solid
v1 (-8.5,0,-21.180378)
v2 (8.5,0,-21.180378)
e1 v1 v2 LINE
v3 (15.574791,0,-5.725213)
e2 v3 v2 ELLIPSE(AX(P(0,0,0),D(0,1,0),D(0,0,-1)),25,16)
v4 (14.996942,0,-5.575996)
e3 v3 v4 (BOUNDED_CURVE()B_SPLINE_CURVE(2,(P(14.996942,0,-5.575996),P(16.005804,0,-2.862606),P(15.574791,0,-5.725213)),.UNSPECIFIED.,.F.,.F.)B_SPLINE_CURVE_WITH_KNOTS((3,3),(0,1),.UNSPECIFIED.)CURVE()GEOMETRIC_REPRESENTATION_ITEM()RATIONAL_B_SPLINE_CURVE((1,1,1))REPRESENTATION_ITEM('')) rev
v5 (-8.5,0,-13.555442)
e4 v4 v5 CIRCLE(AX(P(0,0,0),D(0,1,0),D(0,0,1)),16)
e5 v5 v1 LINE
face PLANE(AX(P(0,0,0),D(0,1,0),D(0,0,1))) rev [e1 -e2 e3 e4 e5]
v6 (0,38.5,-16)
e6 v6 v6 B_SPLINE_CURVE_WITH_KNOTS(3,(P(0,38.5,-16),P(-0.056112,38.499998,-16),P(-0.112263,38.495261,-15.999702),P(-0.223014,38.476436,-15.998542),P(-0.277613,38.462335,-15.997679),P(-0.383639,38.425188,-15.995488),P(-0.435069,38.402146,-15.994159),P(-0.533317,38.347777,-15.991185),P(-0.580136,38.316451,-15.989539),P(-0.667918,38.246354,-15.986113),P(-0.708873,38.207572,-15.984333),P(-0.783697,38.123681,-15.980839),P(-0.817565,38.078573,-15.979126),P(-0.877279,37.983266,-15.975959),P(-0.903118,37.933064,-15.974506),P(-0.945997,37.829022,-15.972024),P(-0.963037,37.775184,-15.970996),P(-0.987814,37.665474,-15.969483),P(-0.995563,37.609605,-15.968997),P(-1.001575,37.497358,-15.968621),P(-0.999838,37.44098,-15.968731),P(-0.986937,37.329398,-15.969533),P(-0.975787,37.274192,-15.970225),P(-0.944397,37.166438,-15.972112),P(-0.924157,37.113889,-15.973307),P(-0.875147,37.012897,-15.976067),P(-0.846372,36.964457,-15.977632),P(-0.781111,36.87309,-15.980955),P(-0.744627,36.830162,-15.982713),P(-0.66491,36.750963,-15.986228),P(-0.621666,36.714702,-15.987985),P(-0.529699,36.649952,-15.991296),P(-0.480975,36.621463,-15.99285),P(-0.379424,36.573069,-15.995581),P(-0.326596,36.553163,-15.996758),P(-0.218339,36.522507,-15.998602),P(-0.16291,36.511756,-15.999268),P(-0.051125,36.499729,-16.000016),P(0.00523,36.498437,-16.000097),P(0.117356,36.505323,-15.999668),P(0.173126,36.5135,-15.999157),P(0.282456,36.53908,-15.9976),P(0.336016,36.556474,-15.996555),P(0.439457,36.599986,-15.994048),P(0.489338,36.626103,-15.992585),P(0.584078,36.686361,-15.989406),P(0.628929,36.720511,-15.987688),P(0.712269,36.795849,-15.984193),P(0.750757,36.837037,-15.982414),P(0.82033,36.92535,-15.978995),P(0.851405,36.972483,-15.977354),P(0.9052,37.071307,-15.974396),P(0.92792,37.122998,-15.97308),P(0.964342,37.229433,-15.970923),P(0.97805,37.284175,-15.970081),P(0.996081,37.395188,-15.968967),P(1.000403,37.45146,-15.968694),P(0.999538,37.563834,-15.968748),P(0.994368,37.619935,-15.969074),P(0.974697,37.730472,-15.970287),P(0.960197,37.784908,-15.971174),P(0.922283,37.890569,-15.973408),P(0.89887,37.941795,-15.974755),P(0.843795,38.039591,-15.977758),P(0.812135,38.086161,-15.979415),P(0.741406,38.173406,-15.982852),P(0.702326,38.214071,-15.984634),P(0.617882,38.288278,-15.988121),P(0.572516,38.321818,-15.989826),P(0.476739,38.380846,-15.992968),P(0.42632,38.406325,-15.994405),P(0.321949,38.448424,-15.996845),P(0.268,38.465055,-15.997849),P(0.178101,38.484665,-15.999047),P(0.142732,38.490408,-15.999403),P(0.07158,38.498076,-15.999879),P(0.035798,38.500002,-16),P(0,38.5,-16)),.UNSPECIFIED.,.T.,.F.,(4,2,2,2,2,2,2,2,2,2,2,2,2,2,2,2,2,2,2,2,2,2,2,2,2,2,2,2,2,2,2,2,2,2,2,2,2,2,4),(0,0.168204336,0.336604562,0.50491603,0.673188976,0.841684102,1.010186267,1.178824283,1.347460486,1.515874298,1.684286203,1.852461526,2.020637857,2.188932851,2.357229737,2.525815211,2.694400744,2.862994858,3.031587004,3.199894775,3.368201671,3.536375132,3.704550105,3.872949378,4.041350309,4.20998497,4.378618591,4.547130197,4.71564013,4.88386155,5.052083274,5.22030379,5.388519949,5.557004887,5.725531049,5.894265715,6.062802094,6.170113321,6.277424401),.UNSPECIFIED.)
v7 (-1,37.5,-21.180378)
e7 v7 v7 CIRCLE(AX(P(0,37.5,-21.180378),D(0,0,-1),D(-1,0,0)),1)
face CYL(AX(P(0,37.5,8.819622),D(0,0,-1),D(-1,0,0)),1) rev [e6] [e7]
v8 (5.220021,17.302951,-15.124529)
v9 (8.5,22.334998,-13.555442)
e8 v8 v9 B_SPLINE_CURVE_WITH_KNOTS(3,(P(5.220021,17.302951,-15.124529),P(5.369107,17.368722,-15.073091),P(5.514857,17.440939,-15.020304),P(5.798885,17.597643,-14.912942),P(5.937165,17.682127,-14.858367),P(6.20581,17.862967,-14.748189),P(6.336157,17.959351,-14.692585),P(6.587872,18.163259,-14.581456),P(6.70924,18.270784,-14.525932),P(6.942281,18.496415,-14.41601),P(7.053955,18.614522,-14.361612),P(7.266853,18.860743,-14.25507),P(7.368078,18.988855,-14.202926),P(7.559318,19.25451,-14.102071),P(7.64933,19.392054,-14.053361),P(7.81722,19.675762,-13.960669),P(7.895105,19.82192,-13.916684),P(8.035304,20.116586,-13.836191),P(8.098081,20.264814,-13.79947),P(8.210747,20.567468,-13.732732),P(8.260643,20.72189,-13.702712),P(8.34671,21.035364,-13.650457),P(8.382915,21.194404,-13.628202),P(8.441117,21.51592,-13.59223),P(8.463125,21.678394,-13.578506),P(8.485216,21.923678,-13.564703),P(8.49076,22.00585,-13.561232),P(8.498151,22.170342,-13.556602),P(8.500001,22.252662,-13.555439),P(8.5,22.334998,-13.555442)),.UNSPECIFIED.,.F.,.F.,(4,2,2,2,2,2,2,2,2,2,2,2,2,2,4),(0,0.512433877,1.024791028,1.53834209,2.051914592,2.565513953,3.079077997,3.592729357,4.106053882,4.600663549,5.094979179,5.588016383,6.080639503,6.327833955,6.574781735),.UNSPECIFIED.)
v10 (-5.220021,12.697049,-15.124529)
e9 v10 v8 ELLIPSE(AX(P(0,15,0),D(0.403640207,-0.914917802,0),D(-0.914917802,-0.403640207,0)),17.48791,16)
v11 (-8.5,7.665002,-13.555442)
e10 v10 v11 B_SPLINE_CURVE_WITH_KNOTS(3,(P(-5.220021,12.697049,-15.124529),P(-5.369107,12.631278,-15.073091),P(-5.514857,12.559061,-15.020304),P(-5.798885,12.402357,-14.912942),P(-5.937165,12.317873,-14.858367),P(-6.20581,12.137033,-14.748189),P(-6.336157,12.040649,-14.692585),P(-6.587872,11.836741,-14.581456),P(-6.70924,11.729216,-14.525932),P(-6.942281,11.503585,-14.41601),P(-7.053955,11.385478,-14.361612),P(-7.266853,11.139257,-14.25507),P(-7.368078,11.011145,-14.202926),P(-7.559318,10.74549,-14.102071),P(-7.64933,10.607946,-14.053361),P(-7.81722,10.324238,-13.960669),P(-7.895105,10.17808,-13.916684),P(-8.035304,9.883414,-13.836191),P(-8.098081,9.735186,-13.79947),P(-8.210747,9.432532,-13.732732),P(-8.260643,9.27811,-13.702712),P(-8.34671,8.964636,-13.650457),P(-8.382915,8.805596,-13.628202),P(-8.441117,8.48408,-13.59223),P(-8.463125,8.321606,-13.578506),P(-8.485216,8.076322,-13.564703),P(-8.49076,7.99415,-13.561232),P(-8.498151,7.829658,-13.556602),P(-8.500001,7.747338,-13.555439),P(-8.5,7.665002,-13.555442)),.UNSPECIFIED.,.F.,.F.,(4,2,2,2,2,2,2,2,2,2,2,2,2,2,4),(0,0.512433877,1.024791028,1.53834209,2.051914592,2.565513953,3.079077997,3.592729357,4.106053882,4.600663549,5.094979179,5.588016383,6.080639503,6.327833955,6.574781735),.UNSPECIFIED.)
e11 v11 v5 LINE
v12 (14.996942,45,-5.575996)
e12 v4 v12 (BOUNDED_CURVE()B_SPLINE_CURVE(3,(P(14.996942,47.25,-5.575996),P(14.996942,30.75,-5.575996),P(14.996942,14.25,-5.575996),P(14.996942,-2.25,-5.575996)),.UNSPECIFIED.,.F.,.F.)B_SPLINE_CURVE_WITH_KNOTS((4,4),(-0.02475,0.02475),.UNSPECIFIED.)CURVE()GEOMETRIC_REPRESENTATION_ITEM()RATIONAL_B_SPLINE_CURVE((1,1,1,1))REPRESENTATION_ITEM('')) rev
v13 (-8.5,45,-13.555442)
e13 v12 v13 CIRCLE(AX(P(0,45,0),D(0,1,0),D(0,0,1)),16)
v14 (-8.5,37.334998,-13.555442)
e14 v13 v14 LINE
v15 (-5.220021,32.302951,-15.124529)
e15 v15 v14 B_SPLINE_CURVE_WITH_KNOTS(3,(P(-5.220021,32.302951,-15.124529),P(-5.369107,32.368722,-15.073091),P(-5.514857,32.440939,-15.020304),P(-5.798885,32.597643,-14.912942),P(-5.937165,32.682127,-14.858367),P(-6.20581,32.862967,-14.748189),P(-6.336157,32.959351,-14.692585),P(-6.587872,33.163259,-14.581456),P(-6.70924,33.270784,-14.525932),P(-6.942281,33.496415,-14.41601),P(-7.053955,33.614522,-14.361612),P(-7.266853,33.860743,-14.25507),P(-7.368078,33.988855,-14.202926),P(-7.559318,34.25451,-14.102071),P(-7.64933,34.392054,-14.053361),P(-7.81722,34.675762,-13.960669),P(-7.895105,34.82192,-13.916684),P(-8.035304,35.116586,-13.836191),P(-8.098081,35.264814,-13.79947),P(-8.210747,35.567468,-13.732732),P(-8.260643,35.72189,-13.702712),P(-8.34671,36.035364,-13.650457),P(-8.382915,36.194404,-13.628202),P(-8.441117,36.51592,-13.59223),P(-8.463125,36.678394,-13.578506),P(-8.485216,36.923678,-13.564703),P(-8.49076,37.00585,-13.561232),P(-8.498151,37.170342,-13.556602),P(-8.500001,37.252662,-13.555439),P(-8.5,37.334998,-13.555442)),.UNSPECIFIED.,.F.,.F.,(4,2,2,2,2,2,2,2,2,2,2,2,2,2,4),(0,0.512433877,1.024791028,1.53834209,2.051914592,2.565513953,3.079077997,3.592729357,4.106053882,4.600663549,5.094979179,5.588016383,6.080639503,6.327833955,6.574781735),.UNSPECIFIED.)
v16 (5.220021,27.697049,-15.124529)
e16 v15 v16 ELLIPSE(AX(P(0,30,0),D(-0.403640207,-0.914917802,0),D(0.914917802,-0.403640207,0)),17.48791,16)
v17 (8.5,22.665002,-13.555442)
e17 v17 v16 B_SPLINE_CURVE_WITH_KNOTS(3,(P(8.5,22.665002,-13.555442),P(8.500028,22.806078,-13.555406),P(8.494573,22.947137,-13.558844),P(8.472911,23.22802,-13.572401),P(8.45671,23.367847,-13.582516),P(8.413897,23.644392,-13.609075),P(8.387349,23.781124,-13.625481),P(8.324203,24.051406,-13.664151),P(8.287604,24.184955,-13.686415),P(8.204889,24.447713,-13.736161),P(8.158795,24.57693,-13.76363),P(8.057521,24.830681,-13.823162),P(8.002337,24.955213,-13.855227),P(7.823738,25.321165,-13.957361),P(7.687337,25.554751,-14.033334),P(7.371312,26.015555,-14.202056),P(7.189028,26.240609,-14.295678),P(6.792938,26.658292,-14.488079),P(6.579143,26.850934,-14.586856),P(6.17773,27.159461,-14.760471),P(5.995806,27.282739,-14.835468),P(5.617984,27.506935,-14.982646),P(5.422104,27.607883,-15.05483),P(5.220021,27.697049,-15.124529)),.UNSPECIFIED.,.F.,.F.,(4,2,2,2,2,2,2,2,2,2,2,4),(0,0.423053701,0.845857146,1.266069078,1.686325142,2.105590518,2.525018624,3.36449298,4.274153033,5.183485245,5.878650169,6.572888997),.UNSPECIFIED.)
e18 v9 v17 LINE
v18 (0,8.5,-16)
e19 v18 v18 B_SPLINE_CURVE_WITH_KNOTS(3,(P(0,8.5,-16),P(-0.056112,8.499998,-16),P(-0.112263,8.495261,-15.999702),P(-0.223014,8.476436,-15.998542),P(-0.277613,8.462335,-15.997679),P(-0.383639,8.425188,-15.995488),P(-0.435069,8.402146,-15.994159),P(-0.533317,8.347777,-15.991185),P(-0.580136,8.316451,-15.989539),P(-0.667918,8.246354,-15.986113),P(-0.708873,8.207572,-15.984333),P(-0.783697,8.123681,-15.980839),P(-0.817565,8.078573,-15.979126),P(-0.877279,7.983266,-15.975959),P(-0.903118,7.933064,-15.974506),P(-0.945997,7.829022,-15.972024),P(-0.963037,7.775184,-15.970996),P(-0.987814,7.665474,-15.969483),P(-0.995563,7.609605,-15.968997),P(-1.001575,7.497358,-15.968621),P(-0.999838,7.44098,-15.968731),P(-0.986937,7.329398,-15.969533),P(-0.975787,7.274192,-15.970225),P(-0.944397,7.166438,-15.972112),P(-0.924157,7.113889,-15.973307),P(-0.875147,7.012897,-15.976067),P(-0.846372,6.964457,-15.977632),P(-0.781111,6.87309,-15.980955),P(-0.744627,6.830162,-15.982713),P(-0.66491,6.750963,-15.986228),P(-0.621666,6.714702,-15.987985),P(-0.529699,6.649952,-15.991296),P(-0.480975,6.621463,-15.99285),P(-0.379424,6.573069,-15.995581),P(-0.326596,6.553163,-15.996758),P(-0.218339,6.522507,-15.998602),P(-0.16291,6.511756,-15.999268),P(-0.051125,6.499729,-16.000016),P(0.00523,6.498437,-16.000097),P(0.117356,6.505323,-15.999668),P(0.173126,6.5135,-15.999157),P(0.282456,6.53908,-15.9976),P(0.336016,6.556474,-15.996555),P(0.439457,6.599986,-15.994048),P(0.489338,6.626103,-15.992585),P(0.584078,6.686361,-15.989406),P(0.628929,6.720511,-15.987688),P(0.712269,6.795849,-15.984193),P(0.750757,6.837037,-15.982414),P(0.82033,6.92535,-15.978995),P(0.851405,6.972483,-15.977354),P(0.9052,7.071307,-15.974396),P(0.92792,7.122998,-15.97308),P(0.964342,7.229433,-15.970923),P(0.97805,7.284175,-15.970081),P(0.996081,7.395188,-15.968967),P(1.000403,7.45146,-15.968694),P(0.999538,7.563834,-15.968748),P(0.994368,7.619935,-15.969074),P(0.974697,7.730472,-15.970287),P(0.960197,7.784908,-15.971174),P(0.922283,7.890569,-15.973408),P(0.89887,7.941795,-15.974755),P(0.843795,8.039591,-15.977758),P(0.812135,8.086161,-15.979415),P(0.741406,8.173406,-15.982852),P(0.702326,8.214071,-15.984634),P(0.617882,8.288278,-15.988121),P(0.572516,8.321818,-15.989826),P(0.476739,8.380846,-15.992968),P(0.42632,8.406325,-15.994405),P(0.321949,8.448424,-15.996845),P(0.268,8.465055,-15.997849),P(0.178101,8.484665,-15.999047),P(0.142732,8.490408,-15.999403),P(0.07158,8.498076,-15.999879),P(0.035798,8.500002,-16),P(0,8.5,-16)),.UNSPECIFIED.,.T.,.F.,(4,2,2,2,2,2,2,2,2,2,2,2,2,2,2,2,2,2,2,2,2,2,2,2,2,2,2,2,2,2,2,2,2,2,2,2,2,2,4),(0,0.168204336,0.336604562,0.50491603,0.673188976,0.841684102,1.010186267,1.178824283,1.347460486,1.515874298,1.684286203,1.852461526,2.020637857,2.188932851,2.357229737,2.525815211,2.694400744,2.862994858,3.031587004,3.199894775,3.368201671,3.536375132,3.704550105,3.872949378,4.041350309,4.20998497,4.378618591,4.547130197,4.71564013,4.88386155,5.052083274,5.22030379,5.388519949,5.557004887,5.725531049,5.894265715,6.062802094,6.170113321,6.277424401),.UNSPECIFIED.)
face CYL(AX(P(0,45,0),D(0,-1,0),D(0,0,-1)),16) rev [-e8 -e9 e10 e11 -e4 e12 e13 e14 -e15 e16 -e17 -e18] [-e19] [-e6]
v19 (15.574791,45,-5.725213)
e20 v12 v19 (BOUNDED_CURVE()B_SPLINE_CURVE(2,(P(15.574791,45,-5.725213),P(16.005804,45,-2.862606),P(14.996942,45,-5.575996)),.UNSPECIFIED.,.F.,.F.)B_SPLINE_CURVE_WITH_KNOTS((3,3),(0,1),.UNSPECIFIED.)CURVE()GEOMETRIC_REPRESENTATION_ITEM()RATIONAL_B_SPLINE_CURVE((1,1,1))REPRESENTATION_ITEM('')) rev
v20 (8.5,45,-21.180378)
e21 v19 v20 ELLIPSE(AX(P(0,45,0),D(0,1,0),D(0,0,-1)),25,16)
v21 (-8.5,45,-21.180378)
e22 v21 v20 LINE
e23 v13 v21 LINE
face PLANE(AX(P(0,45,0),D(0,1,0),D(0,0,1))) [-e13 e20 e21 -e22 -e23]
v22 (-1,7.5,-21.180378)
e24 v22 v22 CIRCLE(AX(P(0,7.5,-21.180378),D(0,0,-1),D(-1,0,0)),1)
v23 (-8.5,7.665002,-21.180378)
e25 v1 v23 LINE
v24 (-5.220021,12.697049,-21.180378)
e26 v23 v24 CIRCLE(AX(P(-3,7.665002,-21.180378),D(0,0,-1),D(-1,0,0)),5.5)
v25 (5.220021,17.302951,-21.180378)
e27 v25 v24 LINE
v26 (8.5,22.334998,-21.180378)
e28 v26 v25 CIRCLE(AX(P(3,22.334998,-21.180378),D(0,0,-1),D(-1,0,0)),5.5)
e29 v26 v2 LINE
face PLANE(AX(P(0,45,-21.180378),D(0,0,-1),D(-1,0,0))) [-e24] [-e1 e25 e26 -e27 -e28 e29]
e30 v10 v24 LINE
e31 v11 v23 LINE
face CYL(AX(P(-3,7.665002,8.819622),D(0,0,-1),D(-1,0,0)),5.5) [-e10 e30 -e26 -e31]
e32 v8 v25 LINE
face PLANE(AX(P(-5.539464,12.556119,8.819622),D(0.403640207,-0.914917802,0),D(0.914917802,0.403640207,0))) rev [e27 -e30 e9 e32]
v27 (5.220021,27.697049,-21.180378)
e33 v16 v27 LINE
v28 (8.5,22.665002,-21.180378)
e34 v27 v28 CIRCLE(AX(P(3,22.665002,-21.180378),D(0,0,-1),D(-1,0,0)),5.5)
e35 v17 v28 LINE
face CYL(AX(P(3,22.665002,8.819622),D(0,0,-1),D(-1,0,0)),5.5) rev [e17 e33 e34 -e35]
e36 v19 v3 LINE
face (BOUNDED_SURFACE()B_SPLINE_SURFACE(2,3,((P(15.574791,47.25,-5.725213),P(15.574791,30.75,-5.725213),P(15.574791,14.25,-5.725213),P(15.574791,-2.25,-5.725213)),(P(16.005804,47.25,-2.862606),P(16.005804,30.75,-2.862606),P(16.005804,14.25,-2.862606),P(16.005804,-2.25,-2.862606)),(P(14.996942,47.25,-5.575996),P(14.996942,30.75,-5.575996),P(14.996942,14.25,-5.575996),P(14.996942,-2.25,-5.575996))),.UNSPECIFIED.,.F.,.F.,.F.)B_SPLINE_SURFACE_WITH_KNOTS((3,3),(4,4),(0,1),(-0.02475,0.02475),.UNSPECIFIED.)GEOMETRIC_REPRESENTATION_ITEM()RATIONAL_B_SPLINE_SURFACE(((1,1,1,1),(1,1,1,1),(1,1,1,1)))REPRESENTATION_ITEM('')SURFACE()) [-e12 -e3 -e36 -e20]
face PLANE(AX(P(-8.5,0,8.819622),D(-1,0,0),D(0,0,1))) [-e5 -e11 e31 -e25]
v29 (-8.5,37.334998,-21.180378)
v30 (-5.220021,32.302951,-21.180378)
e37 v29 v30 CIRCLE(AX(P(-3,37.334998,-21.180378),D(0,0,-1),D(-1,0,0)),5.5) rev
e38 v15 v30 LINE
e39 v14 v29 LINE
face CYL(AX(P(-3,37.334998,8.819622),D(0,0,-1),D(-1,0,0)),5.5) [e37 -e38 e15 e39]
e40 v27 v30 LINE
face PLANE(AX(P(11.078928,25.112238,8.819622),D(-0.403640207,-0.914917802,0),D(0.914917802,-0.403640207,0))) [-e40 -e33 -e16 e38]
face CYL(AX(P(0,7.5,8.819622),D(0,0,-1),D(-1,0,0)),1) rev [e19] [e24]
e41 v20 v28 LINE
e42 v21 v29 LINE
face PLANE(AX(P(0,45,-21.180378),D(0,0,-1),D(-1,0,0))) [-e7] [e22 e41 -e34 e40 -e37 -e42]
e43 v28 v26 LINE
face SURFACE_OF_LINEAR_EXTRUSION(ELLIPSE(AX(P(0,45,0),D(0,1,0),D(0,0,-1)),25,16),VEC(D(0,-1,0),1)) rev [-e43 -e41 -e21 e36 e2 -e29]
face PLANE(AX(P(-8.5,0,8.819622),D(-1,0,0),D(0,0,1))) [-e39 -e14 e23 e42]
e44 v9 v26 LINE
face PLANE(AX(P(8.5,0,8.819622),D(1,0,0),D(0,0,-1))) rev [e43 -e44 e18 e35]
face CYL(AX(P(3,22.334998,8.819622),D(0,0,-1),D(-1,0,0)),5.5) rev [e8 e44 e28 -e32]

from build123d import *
from OCP.BRepAlgoAPI import BRepAlgoAPI_Cut
from OCP.TopTools import TopTools_ListOfShape

# Parameters (mm, degrees)
BOSS_EXTRUDE1_DEPTH = 45
FILLET1_START       = -1
FILLET1_DEPTH       = 47
SKETCH2_R           = 1.0000000000000002
SKETCH2_R_2         = 1
CUT_EXTRUDE2_DEPTH  = 30


with BuildPart() as part:
    # Sketch1 → Boss-Extrude1 (new body)
    with BuildSketch(Plane(origin=(0, 0, 0), x_dir=(1, 0, 0), z_dir=(0, 1, 0))):
        with BuildLine():
            add(Edge.make_bspline(
                [(-8.50000000000007, 21.18037767457174), (-15.999999999999995, 13.832083379312117), (-16, 5.08e-15)],
                knots=[0.5600753062265875, 0.5600753062265875, 0.5600753062265875, 1.5707963267948966, 1.5707963267948966, 1.5707963267948966], degree=2, weights=[1, 0.8750000000000013, 1]))
            ThreePointArc((-16, 1.96e-15), (9.8e-16, 16), (16, 0))
            add(Edge.make_bspline(
                [(16, -8.15e-15), (16.000000000000007, 13.83208337931212), (8.500000000000071, 21.18037767457174)],
                knots=[4.71238898038469, 4.71238898038469, 4.71238898038469, 5.723110000953, 5.723110000953, 5.723110000953], degree=2, weights=[1, 0.8750000000000011, 1]))
            Line((8.500000000000096, 21.18037767457181), (-8.500000000000096, 21.18037767457181))
        make_face()
    extrude(amount=BOSS_EXTRUDE1_DEPTH)


with BuildPart() as fillet1_tool:
    # Fillet1: read off the stored shape, not the designer's step
    # Fillet1 outline → Fillet1 (new body)
    with BuildSketch(Plane(origin=(0, 0, 0), x_dir=(1, 0, 0), z_dir=(0, 1, 0)).offset(FILLET1_START)):
        with BuildLine():
            ThreePointArc((-16, 0), (-15.747238962, 2.832748677), (-14.996941867, 5.575996291))
            add(Edge.make_bspline(
                [(-14.996941867, 5.575996291), (-16.0058043455114, 2.86260640488592), (-15.574790718, 5.72521281)],
                knots=[0, 0, 0, 1, 1, 1], degree=2))
            add(Edge.make_bspline(
                [(-15.574790718, 5.72521281), (-15.999999999999998, 2.901156361523757), (-16, 0)],
                knots=[1.3355704187750619, 1.3355704187750619, 1.3355704187750619, 1.5707963267948966, 1.5707963267948966, 1.5707963267948966], degree=2, weights=[0.9553582068029054, 0.9709086504543596, 1]))
        make_face()
        with BuildLine():
            add(Edge.make_bspline(
                [(15.574790718, 5.72521281), (16.0058043455114, 2.86260640488591), (14.996941867, 5.575996291)],
                knots=[0, 0, 0, 1, 1, 1], degree=2))
            ThreePointArc((14.996941867, 5.575996291), (15.747238962, 2.832748677), (16, 0))
            add(Edge.make_bspline(
                [(16, 0), (15.999999999999998, 2.901156361523736), (15.574790718, 5.72521281)],
                knots=[4.71238898038469, 4.71238898038469, 4.71238898038469, 4.947614888404523, 4.947614888404523, 4.947614888404523], degree=2, weights=[1, 0.9709086504543597, 0.9553582068029054]))
        make_face()
    extrude(amount=FILLET1_DEPTH)


with BuildPart() as part_1:
    add(part.part)

    # Fillet1: cut by fillet1_tool, with a tolerance
    fillet1_stock = TopTools_ListOfShape()
    fillet1_stock.Append(part_1.part.wrapped)
    fillet1_tools = TopTools_ListOfShape()
    fillet1_tools.Append(fillet1_tool.part.wrapped)
    fillet1_cut = BRepAlgoAPI_Cut()
    fillet1_cut.SetArguments(fillet1_stock)
    fillet1_cut.SetTools(fillet1_tools)
    fillet1_cut.SetFuzzyValue(0.00001)
    fillet1_cut.Build()
    add(Compound.cast(fillet1_cut.Shape()).solids(), mode=Mode.REPLACE)

    # Sketch2 → Cut-Extrude2 (cut)
    # profile 1 of 5: a face of its own
    with BuildSketch(Plane(origin=(0, 0, -21.18037767457181), x_dir=(-1, 0, 0), z_dir=(0, 0, -1))):
        Polygon((8.500000000000002, 45), (8.500000000000002, 37.334998409902454), (8.500000000000002, 7.665001590097545), (8.500000000000002, 0), (34.98658656522835, 0), (34.98658656522835, 45), align=None)
    # profile 2 of 5: a face of its own
    with BuildSketch(Plane(origin=(0, 0, -21.18037767457181), x_dir=(-1, 0, 0), z_dir=(0, 0, -1))):
        with BuildLine():
            Line((5.220021136169592, 32.302950501251296), (-5.2200211361696205, 27.697049498748697))
            ThreePointArc((-5.2200211361696205, 27.697049498748697), (-7.607608720851468, 25.668323396953035), (-8.500000000000005, 22.66500159009757))
            Line((-8.500000000000004, 22.66500159009757), (-8.500000000000004, 22.334998409902422))
            ThreePointArc((-8.500000000000005, 22.334998409902422), (-7.607608720851465, 19.331676603046958), (-5.220021136169617, 17.302950501251296))
            Line((-5.220021136169617, 17.302950501251296), (5.2200211361695885, 12.69704949874871))
            ThreePointArc((5.22002113616959, 12.697049498748711), (7.607608720851465, 10.668323396953037), (8.500000000000004, 7.665001590097545))
            Line((8.500000000000002, 7.665001590097545), (8.500000000000002, 37.334998409902454))
            ThreePointArc((8.499999999999998, 37.334998409902454), (7.607608720851465, 34.331676603046965), (5.220021136169594, 32.302950501251296))
        make_face()
        with Locations((0, 22.500000000000004)):
            Circle(SKETCH2_R, mode=Mode.SUBTRACT)
    # profile 3 of 5: a face of its own
    with BuildSketch(Plane(origin=(0, 0, -21.18037767457181), x_dir=(-1, 0, 0), z_dir=(0, 0, -1))):
        with Locations((0, 22.500000000000004)):
            Circle(SKETCH2_R)
    # profile 4 of 5: a face of its own
    with BuildSketch(Plane(origin=(0, 0, -21.18037767457181), x_dir=(-1, 0, 0), z_dir=(0, 0, -1))):
        with Locations((-1.388e-14, 37.5)):
            Circle(SKETCH2_R)
    # profile 5 of 5: a face of its own
    with BuildSketch(Plane(origin=(0, 0, -21.18037767457181), x_dir=(-1, 0, 0), z_dir=(0, 0, -1))):
        with Locations((-1.431e-14, 7.500000000000002)):
            Circle(SKETCH2_R_2)
    extrude(amount=-CUT_EXTRUDE2_DEPTH, mode=Mode.SUBTRACT)


solid = part_1.part
